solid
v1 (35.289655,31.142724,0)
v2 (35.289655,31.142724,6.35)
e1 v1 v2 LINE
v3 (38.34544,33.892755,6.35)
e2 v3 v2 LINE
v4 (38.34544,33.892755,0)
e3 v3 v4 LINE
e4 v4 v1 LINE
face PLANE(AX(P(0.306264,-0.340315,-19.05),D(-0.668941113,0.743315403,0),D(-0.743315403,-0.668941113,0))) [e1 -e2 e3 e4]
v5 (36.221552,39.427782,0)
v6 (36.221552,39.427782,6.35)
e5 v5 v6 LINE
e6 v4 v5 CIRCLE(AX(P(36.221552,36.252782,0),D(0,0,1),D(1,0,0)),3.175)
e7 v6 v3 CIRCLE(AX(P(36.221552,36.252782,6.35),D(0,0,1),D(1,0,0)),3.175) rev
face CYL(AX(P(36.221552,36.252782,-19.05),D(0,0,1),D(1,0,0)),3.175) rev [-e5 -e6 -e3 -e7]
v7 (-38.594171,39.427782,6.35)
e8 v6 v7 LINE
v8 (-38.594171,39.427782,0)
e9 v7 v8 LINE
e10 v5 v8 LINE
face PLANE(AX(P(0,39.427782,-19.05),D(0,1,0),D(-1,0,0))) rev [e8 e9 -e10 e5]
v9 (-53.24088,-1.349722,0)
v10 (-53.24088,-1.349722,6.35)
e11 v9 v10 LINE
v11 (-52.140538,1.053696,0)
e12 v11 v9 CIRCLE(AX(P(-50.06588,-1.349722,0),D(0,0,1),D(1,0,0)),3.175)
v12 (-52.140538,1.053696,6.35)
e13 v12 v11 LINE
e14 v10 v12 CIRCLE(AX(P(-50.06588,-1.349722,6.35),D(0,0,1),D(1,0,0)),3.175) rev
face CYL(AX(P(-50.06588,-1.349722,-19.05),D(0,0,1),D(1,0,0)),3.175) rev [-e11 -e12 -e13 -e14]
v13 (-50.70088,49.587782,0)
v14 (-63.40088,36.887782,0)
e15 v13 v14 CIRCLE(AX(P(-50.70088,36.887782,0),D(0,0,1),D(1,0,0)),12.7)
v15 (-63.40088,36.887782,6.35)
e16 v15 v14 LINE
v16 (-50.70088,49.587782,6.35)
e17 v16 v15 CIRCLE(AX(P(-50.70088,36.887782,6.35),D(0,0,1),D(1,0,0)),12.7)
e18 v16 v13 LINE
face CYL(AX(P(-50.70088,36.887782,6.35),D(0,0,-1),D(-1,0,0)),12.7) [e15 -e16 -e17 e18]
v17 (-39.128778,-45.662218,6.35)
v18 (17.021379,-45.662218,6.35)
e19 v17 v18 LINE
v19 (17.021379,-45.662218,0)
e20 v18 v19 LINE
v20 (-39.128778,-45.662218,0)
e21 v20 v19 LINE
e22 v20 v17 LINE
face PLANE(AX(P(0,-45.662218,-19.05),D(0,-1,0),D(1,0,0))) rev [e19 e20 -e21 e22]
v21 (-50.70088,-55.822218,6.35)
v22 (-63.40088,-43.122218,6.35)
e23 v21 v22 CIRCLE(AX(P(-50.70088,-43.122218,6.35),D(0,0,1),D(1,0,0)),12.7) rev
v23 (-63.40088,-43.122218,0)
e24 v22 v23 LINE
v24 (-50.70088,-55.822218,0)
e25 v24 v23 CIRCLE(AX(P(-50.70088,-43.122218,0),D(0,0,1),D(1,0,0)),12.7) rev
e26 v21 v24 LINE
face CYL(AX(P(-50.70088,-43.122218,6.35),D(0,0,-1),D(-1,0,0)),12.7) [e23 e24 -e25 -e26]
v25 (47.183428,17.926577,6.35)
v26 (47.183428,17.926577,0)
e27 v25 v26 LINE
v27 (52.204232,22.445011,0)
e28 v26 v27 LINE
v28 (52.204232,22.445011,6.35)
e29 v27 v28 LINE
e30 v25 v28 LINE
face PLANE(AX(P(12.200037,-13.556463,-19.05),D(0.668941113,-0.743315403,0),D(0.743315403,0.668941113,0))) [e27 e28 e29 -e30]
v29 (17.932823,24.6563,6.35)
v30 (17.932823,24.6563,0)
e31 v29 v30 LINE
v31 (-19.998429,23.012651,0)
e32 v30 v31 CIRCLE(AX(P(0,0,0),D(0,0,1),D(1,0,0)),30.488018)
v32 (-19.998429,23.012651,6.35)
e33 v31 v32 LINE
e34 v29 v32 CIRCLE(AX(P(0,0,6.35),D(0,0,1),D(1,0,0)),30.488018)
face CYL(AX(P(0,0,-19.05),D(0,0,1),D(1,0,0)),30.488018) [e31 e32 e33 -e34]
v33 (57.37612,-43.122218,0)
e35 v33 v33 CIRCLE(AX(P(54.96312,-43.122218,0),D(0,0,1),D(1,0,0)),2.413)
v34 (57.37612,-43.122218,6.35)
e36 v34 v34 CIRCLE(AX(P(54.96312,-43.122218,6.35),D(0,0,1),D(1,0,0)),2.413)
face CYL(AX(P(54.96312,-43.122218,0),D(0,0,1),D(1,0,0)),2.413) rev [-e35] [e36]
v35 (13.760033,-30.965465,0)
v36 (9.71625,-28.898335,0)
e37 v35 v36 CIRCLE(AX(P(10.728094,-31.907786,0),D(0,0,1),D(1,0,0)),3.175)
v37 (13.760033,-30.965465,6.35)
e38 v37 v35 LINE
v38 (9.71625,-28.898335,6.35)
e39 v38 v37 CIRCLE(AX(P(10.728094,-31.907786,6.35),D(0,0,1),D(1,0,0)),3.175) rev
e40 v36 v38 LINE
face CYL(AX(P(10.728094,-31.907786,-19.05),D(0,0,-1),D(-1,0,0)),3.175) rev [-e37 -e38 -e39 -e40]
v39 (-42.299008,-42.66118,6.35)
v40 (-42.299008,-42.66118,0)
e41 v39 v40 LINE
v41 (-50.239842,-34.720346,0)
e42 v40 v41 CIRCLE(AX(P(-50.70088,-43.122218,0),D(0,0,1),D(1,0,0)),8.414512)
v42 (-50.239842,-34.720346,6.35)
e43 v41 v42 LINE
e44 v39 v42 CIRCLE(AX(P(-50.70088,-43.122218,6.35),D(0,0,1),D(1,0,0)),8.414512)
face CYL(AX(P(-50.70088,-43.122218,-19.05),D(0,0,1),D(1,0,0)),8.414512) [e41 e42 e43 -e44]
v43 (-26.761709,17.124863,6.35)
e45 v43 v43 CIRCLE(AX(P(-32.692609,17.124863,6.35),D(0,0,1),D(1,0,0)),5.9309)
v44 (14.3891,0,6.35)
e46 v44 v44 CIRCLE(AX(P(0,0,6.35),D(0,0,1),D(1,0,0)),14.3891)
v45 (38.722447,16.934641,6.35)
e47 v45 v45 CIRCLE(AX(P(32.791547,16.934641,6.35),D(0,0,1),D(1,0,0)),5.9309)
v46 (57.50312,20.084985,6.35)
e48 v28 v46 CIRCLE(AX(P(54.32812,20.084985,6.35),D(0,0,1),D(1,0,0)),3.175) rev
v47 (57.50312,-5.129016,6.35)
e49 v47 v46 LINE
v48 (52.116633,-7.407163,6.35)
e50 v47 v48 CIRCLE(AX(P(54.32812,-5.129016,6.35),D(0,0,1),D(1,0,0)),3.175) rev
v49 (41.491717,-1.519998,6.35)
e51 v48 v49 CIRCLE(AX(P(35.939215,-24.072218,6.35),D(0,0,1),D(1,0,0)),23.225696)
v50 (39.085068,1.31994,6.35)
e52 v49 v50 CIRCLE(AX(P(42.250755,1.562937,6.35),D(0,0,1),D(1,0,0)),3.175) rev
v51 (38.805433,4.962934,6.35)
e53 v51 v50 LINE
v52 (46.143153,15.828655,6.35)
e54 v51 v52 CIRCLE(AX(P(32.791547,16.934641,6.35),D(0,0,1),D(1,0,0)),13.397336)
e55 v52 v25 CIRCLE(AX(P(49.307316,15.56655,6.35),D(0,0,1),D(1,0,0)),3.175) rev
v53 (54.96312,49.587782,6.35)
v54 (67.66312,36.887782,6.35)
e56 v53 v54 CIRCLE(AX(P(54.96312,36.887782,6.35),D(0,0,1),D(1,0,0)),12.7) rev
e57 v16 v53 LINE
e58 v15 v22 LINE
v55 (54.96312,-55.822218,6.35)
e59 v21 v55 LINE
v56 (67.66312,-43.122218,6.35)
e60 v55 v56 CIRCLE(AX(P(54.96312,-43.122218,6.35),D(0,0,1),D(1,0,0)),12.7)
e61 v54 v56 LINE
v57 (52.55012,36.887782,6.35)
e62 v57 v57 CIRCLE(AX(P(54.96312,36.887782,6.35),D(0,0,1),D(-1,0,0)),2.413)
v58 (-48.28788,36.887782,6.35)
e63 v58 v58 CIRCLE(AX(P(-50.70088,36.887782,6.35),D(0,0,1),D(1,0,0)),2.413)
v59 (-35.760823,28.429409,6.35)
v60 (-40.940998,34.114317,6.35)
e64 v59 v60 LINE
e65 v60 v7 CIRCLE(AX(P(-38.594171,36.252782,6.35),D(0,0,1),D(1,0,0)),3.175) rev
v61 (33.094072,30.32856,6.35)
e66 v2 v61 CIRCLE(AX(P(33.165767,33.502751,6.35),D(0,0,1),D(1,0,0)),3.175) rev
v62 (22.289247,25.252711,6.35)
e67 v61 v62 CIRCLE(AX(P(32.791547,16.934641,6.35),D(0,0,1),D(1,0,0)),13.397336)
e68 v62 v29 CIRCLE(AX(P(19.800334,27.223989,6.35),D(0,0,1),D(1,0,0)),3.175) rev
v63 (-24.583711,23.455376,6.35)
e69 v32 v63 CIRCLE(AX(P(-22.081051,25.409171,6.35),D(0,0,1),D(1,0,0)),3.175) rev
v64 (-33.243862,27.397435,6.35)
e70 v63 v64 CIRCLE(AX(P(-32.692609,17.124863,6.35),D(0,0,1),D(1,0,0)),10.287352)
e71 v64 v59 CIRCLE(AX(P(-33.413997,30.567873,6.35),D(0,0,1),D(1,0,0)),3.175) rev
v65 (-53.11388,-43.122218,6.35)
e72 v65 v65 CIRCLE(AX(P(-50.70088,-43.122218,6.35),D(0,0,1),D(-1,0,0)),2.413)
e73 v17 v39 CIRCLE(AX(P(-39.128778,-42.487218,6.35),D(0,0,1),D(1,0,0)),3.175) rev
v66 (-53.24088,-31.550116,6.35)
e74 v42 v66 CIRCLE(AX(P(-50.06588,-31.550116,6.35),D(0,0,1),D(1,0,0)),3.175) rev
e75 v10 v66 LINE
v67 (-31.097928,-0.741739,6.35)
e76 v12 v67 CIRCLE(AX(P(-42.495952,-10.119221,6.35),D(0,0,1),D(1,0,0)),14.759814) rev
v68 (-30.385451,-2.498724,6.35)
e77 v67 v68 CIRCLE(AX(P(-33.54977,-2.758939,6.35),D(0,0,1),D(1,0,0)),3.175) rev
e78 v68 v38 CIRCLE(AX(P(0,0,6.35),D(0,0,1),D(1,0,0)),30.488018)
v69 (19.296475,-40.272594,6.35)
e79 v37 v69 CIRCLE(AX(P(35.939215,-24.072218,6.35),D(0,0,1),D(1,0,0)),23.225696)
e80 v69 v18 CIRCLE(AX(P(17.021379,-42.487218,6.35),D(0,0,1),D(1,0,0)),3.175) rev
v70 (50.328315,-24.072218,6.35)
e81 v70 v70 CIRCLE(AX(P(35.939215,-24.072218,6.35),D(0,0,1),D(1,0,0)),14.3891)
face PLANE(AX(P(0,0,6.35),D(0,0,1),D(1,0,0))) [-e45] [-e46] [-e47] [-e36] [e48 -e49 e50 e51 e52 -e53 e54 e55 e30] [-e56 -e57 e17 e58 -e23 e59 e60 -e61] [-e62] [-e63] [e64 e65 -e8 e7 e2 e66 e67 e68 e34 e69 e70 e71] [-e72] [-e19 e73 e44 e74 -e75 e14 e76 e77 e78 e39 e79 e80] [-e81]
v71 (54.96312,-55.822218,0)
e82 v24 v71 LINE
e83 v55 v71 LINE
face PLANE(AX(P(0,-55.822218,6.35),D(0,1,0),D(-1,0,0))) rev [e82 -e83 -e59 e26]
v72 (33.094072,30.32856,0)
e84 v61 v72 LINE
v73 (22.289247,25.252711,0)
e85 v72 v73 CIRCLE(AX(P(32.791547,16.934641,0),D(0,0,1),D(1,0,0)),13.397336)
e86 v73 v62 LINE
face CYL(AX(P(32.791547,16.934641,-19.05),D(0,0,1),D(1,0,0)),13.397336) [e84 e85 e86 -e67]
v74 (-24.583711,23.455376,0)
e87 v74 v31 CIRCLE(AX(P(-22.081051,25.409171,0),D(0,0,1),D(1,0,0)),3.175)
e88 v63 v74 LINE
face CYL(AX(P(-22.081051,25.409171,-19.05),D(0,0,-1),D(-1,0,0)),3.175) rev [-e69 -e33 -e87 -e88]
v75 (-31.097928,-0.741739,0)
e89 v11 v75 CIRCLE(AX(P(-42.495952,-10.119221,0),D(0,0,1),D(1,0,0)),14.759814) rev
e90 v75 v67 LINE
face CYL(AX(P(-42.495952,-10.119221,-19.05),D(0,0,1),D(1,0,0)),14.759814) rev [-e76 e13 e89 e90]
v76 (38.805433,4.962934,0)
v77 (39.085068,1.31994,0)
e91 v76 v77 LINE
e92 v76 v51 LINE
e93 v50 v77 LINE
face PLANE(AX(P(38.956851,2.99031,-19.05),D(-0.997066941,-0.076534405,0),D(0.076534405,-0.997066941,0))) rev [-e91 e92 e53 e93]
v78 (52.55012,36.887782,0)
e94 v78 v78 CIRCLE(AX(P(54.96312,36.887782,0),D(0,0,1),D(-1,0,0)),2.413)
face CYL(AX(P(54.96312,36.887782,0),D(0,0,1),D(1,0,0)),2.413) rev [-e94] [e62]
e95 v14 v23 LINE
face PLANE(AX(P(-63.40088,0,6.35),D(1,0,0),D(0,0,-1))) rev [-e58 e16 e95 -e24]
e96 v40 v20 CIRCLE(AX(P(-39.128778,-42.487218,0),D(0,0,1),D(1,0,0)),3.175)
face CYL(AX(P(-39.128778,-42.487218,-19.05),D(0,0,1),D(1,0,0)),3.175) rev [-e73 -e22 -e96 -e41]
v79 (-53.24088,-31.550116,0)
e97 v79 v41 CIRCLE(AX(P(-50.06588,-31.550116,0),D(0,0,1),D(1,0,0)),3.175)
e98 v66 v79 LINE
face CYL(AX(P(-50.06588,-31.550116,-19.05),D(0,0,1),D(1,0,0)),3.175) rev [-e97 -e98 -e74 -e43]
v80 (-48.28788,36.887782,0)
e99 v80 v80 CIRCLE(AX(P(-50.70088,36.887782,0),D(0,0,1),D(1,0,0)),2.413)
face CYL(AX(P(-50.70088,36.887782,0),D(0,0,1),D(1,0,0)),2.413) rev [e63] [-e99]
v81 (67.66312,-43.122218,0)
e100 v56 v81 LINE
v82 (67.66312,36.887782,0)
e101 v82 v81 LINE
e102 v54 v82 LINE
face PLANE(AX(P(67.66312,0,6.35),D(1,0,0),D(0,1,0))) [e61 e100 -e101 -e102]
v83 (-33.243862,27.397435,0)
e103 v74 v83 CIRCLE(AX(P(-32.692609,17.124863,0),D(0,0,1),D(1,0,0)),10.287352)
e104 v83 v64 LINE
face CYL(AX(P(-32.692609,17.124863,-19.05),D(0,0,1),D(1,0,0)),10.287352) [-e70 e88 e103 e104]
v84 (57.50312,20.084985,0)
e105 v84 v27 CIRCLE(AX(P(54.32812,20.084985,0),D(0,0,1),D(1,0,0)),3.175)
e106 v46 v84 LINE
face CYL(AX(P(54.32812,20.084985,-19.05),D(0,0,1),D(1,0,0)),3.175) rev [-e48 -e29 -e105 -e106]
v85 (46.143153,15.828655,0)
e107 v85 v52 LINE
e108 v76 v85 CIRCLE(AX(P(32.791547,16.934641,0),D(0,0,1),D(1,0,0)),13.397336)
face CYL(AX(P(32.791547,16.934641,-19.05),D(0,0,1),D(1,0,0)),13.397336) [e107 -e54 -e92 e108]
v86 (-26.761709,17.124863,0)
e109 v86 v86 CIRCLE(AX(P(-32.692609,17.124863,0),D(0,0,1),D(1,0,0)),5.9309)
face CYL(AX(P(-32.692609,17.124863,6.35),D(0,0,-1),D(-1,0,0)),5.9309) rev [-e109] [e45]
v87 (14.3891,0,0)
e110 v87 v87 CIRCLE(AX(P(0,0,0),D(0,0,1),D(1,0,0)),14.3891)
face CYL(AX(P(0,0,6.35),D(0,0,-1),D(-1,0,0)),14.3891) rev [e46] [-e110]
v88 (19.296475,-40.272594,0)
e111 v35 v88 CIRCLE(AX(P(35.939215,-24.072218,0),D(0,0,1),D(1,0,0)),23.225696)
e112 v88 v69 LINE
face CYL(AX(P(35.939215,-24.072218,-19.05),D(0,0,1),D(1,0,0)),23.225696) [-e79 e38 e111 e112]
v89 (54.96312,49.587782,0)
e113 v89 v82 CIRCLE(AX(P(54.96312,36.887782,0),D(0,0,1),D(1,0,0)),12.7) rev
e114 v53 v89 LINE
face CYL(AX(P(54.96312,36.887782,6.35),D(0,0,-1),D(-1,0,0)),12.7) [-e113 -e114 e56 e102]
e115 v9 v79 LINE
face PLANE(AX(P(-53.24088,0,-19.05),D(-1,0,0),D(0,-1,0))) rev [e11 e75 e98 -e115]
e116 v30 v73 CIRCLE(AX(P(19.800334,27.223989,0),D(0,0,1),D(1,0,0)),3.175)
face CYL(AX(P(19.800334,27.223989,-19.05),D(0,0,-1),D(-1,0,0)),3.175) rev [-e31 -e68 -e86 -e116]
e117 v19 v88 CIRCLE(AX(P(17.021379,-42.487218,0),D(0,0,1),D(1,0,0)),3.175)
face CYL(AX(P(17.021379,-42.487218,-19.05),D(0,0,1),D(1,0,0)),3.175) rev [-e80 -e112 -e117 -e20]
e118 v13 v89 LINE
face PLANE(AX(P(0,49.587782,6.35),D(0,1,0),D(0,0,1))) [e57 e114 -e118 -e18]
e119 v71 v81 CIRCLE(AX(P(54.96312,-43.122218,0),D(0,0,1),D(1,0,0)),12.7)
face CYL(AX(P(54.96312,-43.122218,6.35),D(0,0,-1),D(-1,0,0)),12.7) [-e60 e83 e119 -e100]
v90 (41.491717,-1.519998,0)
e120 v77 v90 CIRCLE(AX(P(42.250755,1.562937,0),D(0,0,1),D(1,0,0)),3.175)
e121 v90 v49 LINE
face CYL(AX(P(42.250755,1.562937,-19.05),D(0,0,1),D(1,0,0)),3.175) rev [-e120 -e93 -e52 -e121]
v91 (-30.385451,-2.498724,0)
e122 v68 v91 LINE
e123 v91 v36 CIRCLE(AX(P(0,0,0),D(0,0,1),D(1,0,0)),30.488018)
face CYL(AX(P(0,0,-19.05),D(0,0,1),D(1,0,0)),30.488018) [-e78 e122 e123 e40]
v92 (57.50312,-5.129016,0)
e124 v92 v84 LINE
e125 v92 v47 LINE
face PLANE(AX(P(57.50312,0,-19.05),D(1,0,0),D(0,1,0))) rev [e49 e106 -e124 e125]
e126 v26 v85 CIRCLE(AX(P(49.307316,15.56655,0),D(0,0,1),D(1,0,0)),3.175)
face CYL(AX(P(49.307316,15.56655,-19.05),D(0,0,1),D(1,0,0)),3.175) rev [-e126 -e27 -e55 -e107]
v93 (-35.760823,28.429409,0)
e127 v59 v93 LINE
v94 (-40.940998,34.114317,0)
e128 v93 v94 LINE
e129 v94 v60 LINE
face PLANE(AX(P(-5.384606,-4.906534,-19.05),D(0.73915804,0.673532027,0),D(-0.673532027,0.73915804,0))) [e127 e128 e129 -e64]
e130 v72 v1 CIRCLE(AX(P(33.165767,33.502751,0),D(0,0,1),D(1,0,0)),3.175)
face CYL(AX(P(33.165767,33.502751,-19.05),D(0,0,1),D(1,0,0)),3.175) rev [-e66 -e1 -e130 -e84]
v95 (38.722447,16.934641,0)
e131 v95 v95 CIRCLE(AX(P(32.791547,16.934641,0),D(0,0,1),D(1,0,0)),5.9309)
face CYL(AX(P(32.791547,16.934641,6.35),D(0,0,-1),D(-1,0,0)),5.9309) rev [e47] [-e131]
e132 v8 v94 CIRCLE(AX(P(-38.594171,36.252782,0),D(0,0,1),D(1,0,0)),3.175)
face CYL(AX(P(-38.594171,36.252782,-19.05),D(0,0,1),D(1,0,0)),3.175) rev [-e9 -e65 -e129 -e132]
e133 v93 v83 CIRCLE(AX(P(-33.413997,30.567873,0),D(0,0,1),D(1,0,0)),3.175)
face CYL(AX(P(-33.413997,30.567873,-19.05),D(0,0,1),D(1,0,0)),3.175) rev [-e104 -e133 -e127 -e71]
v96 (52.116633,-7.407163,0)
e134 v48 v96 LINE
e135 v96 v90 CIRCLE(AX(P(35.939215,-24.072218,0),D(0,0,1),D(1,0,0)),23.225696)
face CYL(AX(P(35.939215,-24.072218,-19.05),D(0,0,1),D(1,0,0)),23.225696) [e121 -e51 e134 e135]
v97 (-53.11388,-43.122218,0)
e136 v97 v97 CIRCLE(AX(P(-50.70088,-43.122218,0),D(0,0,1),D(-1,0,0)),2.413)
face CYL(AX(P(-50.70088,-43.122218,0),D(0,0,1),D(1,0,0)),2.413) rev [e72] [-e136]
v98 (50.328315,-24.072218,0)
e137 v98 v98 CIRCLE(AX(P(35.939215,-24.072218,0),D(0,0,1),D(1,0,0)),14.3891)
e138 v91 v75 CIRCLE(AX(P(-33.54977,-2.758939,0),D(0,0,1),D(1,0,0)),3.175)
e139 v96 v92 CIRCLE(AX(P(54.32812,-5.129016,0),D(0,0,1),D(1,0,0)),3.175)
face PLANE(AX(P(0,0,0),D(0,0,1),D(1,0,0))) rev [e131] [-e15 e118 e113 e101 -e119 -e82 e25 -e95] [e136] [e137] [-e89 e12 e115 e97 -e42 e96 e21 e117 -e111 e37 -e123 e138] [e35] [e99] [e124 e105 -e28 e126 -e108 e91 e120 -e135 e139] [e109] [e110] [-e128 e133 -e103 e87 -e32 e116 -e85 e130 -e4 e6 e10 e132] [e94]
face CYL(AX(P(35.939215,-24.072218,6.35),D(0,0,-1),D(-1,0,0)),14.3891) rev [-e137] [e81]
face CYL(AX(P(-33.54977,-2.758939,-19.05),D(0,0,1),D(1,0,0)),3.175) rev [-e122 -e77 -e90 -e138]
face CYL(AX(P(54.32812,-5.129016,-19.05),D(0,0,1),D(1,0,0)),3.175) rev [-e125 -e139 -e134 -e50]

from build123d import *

# Parameters (mm, degrees)
SKETCH1_R           = 14.3891
SKETCH1_R_2         = 5.9309
BOSS_EXTRUDE2_DEPTH = 6.35
SKETCH2_R           = 2.413
CUT_EXTRUDE1_DEPTH  = 6.35
CUT_EXTRUDE6_DEPTH  = 25.4
FILLET4_R           = 3.175
FILLET6_R           = 3.175
FILLET5_R           = 3.175


with BuildPart() as part:
    # Sketch1 → Boss-Extrude2 (new body)
    with BuildSketch(Plane.XY):
        with BuildLine():
            Line((54.963119593, 49.587781591), (-50.700880407, 49.587781591))
            ThreePointArc((-50.700880407, 49.587781591), (-59.681136528, 45.868037712), (-63.400880407, 36.887781591))
            Line((-63.400880407, 36.887781591), (-63.400880407, -43.122218409))
            ThreePointArc((-63.400880407, -43.122218409), (-59.681136528, -52.10247453), (-50.700880407, -55.822218409))
            Line((-50.700880407, -55.822218409), (54.963119593, -55.822218409))
            ThreePointArc((54.963119593, -55.822218409), (63.943375714, -52.10247453), (67.663119593, -43.122218409))
            Line((67.663119593, -43.122218409), (67.663119593, 36.887781591))
            ThreePointArc((67.663119593, 36.887781591), (63.943375714, 45.868037712), (54.963119593, 49.587781591))
        make_face()
        with Locations((35.939214506, -24.072218409)):
            Circle(SKETCH1_R, mode=Mode.SUBTRACT)
        with Locations((-32.69260882, 17.124862832)):
            Circle(SKETCH1_R_2, mode=Mode.SUBTRACT)
        Circle(SKETCH1_R, mode=Mode.SUBTRACT)
        with Locations((32.791546632, 16.934641063)):
            Circle(SKETCH1_R_2, mode=Mode.SUBTRACT)
    extrude(amount=BOSS_EXTRUDE2_DEPTH)

    # Sketch2 → Cut-Extrude1 (cut)
    with BuildSketch(Plane.XY.offset(6.35)):
        with Locations((-50.700880407, 36.887781591)):
            Circle(SKETCH2_R)
        with Locations((54.963119593, 36.887781591)):
            Circle(SKETCH2_R)
        with Locations((54.963119593, -43.122218409)):
            Circle(SKETCH2_R)
        with Locations((-50.700880407, -43.122218409)):
            Circle(SKETCH2_R)
    extrude(amount=-CUT_EXTRUDE1_DEPTH, mode=Mode.SUBTRACT)

    # Sketch3 → Cut-Extrude6 (cut)
    with BuildSketch(Plane.XY.offset(6.35)):
        with BuildLine():
            ThreePointArc((-22.865276921, 20.166764197), (-1.620277869, 30.444933347), (20.595631427, 22.479751622))
            ThreePointArc((20.595631427, 22.479751622), (26.18341036, 28.588873504), (34.294760977, 30.247377274))
            Line((34.294760977, 30.247377274), (44.495862095, 39.427781591))
            Line((44.495862095, 39.427781591), (-45.782707456, 39.427781591))
            Line((-45.782707456, 39.427781591), (-34.660782298, 27.22218472))
            ThreePointArc((-34.660782298, 27.22218472), (-27.411857693, 25.953412186), (-22.865276921, 20.166764197))
        make_face()
        with BuildLine():
            ThreePointArc((27.37738958, -45.662218409), (17.771598796, -38.541865449), (12.980930477, -27.58649508))
            ThreePointArc((12.980930477, -27.58649508), (-15.657094436, -26.160555435), (-30.44625116, -1.595323538))
            ThreePointArc((-30.44625116, -1.595323538), (-41.465480232, 4.60457782), (-53.240880407, 0))
            Line((-53.240880407, 0), (-53.240880407, -35.100222849))
            ThreePointArc((-53.240880407, -35.100222849), (-44.750921888, -37.17225989), (-42.678884848, -45.662218409))
            Line((-42.678884848, -45.662218409), (27.37738958, -45.662218409))
        make_face()
        with BuildLine():
            ThreePointArc((46.188533959, 17.031229414), (44.21986427, 9.94306365), (38.805433181, 4.962934111))
            Line((38.805433181, 4.962934111), (39.269790063, -1.08656609))
            ThreePointArc((39.269790063, -1.08656609), (50.308421041, -5.825058365), (57.503119593, -15.444881422))
            Line((57.503119593, -15.444881422), (57.503119593, 27.213705757))
            Line((57.503119593, 27.213705757), (46.188533959, 17.031229414))
        make_face()
    extrude(amount=-CUT_EXTRUDE6_DEPTH, mode=Mode.SUBTRACT)

    # Fillet4
    fillet4_edges = [part.edges().sort_by_distance(p)[0] for p in [
        (57.503119593, 27.213705757, 3.175),
        (44.495862095, 39.427781591, 3.175),
        (46.188533959, 17.031229414, 3.175),
        (-45.782707456, 39.427781591, 3.175),
        (39.269790063, -1.08656609, 3.175),
        (34.294760977, 30.247377274, 3.175),
        (-34.660782298, 27.22218472, 3.175),
        (-22.865276921, 20.166764197, 3.175),
        (57.503119593, -15.444881422, 3.175),
    ]]
    fillet(fillet4_edges, radius=FILLET4_R)

    # Fillet6
    fillet6_edges = [part.edges().sort_by_distance(p)[0] for p in [
        (20.595631427, 22.479751622, 3.175),
    ]]
    fillet(fillet6_edges, radius=FILLET6_R)

    # Fillet5
    fillet5_edges = [part.edges().sort_by_distance(p)[0] for p in [
        (27.37738958, -45.662218409, 3.175),
        (12.980930477, -27.58649508, 3.175),
        (-30.44625116, -1.595323538, 3.175),
        (-53.240880407, 0, 3.175),
        (-42.678884848, -45.662218409, 3.175),
        (-53.240880407, -35.100222849, 3.175),
    ]]
    fillet(fillet5_edges, radius=FILLET5_R)


solid = part.part
